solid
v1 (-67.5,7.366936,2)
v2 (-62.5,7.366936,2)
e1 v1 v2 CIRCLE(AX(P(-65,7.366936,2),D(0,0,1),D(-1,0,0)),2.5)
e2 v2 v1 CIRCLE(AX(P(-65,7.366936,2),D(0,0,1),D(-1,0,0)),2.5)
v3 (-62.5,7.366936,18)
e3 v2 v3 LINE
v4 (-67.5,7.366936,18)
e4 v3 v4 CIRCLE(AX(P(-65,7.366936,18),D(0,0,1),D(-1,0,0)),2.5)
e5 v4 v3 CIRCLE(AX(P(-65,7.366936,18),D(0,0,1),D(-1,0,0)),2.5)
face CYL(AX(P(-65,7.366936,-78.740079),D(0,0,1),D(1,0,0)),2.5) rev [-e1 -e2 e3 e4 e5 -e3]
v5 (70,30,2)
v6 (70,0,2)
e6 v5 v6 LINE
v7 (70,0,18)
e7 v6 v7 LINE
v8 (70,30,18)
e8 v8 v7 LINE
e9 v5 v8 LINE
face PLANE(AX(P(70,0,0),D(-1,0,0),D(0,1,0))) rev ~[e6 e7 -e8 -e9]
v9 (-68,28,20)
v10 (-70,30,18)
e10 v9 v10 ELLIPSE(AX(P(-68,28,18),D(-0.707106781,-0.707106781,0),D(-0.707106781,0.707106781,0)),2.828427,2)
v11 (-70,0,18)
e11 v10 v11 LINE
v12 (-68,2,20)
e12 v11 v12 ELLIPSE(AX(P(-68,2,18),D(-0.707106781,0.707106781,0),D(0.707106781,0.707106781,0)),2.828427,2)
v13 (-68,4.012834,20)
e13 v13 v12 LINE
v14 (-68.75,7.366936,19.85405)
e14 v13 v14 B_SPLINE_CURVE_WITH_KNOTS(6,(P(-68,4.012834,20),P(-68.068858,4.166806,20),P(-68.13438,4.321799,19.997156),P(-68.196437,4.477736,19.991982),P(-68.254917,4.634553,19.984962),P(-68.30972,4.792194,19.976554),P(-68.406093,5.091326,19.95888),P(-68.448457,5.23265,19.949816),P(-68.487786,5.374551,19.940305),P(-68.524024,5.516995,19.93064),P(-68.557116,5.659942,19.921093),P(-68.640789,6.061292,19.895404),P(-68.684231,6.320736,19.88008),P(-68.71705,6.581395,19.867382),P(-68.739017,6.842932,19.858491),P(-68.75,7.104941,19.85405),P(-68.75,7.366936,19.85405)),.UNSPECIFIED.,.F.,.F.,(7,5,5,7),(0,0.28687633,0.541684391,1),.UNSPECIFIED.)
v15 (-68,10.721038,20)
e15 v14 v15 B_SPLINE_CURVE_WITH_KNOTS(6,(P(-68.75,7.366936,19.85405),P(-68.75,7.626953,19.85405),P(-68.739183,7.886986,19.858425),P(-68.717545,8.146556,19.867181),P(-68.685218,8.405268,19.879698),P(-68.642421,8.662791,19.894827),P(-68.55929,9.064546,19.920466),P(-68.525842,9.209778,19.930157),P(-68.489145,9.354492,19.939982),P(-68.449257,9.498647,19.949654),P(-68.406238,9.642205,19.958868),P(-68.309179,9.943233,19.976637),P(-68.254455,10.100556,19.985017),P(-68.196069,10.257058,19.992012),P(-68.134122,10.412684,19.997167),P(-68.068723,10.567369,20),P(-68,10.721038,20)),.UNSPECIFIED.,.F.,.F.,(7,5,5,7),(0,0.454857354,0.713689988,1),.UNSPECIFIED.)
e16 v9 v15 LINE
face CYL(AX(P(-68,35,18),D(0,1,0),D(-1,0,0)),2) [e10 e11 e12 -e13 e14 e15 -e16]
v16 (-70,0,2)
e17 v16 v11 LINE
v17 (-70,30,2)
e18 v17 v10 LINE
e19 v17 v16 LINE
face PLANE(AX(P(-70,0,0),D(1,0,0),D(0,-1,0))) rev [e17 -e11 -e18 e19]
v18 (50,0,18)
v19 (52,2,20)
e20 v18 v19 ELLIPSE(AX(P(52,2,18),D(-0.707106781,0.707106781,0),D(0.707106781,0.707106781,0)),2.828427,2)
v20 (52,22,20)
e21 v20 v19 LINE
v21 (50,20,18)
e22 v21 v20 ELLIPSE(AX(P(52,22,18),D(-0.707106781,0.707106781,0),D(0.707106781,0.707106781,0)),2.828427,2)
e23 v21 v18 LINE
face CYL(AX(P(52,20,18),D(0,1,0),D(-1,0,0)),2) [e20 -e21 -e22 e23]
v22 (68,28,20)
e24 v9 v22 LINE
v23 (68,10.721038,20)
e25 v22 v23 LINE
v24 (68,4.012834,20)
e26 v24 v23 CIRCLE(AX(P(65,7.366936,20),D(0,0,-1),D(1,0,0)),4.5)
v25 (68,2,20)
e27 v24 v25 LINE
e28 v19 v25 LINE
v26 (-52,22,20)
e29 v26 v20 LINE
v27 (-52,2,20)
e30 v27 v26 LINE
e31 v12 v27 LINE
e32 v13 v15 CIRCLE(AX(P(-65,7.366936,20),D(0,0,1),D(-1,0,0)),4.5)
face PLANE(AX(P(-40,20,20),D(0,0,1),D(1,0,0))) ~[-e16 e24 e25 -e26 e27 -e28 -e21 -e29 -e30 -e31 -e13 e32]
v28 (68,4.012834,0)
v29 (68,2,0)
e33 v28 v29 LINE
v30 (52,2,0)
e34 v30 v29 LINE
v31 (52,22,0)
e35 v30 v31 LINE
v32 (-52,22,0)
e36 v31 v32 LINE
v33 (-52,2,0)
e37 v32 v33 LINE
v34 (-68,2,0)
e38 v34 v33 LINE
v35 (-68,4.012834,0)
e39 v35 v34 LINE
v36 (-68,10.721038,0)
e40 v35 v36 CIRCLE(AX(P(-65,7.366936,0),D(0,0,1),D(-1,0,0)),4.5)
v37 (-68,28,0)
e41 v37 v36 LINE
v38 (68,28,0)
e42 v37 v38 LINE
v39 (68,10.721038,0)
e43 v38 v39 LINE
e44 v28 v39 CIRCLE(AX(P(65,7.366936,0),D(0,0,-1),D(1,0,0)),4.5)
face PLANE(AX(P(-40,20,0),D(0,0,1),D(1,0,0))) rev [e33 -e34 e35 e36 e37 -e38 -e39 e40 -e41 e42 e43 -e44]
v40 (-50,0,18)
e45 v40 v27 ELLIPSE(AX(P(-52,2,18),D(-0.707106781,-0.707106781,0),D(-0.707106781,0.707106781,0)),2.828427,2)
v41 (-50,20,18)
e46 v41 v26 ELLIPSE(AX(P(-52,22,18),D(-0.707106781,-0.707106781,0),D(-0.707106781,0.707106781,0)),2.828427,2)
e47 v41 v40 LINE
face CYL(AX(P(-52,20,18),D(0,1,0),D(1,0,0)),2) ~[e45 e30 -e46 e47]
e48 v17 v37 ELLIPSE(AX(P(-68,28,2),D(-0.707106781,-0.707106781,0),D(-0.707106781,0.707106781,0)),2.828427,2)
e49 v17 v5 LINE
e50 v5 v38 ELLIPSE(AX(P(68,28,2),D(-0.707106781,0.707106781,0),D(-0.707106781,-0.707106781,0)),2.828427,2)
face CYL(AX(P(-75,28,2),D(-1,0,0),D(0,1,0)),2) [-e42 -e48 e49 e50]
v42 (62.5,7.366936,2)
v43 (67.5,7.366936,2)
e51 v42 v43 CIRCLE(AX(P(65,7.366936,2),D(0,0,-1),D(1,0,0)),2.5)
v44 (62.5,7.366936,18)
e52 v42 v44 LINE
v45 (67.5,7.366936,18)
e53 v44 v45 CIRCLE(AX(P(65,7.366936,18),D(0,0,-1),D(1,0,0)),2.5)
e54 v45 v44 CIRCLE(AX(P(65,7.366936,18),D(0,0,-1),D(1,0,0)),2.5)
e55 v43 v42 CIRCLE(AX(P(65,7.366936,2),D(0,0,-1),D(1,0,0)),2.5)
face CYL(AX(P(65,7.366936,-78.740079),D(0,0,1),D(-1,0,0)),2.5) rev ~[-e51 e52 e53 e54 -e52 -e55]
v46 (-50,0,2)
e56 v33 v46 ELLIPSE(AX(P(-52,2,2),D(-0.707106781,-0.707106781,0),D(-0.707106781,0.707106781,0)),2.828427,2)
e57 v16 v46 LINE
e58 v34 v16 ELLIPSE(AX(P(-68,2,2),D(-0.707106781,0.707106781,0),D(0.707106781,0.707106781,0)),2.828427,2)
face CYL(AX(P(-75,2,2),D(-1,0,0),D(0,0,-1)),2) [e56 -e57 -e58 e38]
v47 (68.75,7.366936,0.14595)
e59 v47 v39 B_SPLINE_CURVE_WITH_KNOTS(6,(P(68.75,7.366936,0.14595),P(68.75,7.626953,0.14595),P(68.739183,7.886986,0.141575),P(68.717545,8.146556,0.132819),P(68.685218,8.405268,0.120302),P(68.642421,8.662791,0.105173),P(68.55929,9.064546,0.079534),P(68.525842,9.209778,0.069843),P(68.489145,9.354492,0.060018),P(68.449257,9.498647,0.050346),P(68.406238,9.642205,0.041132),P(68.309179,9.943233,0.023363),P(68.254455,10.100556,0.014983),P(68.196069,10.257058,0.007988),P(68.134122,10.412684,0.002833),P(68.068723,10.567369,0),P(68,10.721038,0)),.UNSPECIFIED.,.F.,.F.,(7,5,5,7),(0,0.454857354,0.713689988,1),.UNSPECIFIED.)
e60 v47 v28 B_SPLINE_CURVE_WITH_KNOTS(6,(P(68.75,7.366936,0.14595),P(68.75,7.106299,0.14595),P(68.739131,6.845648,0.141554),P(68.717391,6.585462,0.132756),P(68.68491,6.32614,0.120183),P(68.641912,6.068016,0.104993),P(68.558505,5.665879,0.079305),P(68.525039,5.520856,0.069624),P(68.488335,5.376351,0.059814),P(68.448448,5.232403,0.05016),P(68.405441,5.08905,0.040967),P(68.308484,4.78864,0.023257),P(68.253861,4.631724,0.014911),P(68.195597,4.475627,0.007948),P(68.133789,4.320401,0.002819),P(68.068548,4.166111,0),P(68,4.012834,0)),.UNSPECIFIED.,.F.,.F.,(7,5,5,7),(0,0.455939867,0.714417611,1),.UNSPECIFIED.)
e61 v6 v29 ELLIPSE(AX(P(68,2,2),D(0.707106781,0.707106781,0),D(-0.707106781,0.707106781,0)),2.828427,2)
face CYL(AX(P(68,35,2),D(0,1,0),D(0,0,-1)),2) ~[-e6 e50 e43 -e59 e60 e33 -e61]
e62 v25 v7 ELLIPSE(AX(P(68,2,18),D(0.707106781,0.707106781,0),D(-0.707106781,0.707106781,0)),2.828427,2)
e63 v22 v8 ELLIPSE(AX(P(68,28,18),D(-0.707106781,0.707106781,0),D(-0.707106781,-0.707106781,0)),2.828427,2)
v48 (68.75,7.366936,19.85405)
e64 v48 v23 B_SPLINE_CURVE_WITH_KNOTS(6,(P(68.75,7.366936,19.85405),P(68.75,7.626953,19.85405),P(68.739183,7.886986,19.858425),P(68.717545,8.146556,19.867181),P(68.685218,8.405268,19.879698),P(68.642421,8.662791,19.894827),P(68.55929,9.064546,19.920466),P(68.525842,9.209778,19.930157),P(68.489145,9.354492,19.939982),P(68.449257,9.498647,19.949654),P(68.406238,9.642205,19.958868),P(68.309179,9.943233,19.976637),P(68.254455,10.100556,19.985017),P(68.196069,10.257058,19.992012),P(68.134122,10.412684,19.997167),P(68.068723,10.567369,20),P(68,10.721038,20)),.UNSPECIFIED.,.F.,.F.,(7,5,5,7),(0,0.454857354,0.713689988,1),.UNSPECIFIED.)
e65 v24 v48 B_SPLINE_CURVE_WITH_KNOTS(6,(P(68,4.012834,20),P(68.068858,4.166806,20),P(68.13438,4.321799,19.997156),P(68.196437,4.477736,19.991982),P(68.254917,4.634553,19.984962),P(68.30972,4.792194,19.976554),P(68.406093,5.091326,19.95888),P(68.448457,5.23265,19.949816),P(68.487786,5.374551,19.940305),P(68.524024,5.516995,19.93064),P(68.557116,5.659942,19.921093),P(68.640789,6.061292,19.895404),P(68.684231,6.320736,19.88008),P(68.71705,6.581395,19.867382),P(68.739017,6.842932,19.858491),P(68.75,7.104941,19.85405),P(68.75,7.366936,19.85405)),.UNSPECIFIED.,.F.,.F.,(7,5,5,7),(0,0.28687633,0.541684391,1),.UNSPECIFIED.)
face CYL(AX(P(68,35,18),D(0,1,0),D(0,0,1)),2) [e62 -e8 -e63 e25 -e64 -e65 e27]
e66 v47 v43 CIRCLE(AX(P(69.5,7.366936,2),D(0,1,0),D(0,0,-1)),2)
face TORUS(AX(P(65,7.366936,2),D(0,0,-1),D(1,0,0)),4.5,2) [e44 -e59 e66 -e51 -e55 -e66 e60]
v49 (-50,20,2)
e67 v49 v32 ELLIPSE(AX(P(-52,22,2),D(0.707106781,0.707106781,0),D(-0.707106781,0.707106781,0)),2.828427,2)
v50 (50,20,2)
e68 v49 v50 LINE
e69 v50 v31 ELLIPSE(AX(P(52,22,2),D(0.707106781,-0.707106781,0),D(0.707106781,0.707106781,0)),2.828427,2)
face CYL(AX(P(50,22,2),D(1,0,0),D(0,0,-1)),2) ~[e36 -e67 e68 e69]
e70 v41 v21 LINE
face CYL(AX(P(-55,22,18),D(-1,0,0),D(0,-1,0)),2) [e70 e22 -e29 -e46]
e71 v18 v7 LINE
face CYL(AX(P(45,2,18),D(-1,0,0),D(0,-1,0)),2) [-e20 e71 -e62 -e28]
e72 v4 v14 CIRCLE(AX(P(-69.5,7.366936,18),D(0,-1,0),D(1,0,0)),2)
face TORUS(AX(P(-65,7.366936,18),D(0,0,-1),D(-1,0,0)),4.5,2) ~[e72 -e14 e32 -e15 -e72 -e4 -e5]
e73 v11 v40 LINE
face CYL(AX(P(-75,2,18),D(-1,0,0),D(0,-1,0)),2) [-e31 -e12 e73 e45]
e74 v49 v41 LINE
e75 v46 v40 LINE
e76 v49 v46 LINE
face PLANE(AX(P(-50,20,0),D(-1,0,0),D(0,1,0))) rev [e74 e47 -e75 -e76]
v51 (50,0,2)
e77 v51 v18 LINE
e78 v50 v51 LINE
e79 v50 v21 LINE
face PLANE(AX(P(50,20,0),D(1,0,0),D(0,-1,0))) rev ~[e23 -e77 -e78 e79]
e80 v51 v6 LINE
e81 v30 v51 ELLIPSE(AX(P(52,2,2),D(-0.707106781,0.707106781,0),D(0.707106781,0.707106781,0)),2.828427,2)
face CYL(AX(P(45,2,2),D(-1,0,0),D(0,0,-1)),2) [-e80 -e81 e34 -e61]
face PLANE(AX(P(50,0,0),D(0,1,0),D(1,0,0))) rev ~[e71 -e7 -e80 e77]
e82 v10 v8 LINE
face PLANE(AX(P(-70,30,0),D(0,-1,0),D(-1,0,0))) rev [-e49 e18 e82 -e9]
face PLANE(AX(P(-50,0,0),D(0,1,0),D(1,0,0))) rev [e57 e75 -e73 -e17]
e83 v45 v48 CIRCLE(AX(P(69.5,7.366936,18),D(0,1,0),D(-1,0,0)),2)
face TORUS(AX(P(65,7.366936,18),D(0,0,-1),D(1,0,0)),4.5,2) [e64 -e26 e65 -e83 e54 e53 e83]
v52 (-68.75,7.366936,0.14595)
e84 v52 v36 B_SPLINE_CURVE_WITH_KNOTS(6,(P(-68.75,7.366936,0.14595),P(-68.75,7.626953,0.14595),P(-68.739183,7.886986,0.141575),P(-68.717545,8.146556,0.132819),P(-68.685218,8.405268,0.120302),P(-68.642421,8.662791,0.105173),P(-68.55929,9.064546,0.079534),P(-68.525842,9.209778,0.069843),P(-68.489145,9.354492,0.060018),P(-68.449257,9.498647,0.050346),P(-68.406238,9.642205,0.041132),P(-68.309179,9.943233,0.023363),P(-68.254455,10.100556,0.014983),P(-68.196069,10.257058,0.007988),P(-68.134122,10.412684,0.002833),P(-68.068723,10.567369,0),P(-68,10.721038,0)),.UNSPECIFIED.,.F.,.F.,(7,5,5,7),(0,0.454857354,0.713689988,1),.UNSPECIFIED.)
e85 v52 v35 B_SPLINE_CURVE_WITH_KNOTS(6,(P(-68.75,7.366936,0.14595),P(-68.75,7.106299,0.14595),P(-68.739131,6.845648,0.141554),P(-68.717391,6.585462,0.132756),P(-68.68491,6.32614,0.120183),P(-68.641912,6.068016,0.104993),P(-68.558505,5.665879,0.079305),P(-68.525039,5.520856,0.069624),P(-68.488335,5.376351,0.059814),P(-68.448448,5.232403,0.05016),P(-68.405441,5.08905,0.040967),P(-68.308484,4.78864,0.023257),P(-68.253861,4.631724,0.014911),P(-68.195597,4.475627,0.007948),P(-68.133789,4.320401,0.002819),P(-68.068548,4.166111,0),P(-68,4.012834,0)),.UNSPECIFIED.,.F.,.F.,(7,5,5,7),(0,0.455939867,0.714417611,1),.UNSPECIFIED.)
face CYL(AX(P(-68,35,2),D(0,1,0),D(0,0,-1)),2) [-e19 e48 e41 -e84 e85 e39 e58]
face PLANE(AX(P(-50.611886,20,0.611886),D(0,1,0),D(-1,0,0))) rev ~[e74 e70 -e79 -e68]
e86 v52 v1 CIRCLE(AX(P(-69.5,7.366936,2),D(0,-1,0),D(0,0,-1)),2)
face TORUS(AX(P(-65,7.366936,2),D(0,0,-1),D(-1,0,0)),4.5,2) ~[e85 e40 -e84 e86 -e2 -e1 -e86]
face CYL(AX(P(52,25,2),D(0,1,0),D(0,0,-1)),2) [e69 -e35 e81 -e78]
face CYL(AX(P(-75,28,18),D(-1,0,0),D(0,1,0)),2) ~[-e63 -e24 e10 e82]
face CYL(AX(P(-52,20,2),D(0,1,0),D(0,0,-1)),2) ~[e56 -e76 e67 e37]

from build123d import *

# Parameters (mm, degrees)
F1_DEPTH     = 20
F3_D         = 5
F5_T1_DEPTH  = 150
F5_T3_DEPTH  = 40
F5_T5_DEPTH  = 30
F5_T7_DEPTH  = 25
F5_T9_DEPTH  = 100
F5_T11_DEPTH = 30
F5_T25_DEPTH = 105
F5_T29_DEPTH = 30
F5_T36_DEPTH = 30
F5_T40_DEPTH = 105
F5_T47_DEPTH = 30
F5_T51_DEPTH = 105
F5_T58_DEPTH = 105
F5_T62_DEPTH = 30


# Not quite as in the source:
# - a fillet or chamfer that OpenCascade refuses, or shapes differently, is made with other operations: its cross-section is extruded or revolved along the edge and cut away or added


with BuildPart() as f1:
    # F0 (on Top) → F1 (new body)
    with BuildSketch(Plane.XY):
        Polygon((70, 30), (0, 30), (0, 20), (50, 20), (50, 0), (70, 0), align=None)
    extrude(amount=F1_DEPTH)

    # F3 (through all)
    with Locations(Plane(origin=(0, 0, 0), x_dir=(1, 0, 0), z_dir=(0, 0, -1))):
        with Locations((65, -7.3669357225)):
            Hole(F3_D / 2)

    # F4: F1 across face


with BuildPart() as f1_1:
    add(f1.part)
    add(f1.part.mirror(Plane(origin=(0, 25, 10), x_dir=(0, -1, 0), z_dir=(-1, 0, 0))))

    # F5: fillet of radius 2 on 20 edges, made by hand

    # F5_s2 → F5_t1 (cut)
    with BuildSketch(Plane.YZ.offset(-75)):
        with BuildLine():
            ThreePointArc((30, 18), (29.4142135624, 19.4142135624), (28, 20))
            Line((28, 20), (30, 20))
            Line((30, 20), (30, 18))
        make_face()
        with BuildLine():
            ThreePointArc((30, 2), (29.4142135624, 0.5857864376), (28, 0))
            Line((28, 0), (30, 0))
            Line((30, 0), (30, 2))
        make_face()
    extrude(amount=F5_T1_DEPTH, mode=Mode.SUBTRACT)

    # F5_s4 → F5_t3 (cut)
    with BuildSketch(Plane.XZ.offset(-35)):
        with BuildLine():
            ThreePointArc((-70, 18), (-69.4142135624, 19.4142135624), (-68, 20))
            Line((-68, 20), (-70, 20))
            Line((-70, 20), (-70, 18))
        make_face()
        with BuildLine():
            ThreePointArc((68, 20), (69.4142135624, 19.4142135624), (70, 18))
            Line((70, 18), (70, 20))
            Line((70, 20), (68, 20))
        make_face()
        with BuildLine():
            ThreePointArc((-68, 0), (-69.4142135624, 0.5857864376), (-70, 2))
            Line((-70, 2), (-70, 0))
            Line((-70, 0), (-68, 0))
        make_face()
        with BuildLine():
            ThreePointArc((68, 0), (69.4142135624, 0.5857864376), (70, 2))
            Line((70, 2), (70, 0))
            Line((70, 0), (68, 0))
        make_face()
    extrude(amount=F5_T3_DEPTH, mode=Mode.SUBTRACT)

    # F5_s6 → F5_t5 (cut)
    with BuildSketch(Plane.YZ.offset(-75)):
        with BuildLine():
            ThreePointArc((0, 18), (0.5857864376, 19.4142135624), (2, 20))
            Line((2, 20), (0, 20))
            Line((0, 20), (0, 18))
        make_face()
        with BuildLine():
            ThreePointArc((2, 0), (0.5857864376, 0.5857864376), (0, 2))
            Line((0, 2), (0, 0))
            Line((0, 0), (2, 0))
        make_face()
    extrude(amount=F5_T5_DEPTH, mode=Mode.SUBTRACT)

    # F5_s8 → F5_t7 (cut)
    with BuildSketch(Plane.XZ.offset(-20)):
        with BuildLine():
            ThreePointArc((-50, 18), (-50.5857864376, 19.4142135624), (-52, 20))
            Line((-52, 20), (-50, 20))
            Line((-50, 20), (-50, 18))
        make_face()
        with BuildLine():
            ThreePointArc((50, 18), (50.5857864376, 19.4142135624), (52, 20))
            Line((52, 20), (50, 20))
            Line((50, 20), (50, 18))
        make_face()
        with BuildLine():
            ThreePointArc((-52, 0), (-50.5857864376, 0.5857864376), (-50, 2))
            Line((-50, 2), (-50, 0))
            Line((-50, 0), (-52, 0))
        make_face()
        with BuildLine():
            ThreePointArc((52, 0), (50.5857864376, 0.5857864376), (50, 2))
            Line((50, 2), (50, 0))
            Line((50, 0), (52, 0))
        make_face()
    extrude(amount=F5_T7_DEPTH, mode=Mode.SUBTRACT)

    # F5_s10 → F5_t9 (cut)
    with BuildSketch(Plane.YZ.offset(-50)):
        with BuildLine():
            ThreePointArc((20, 18), (20.5857864376, 19.4142135624), (22, 20))
            Line((22, 20), (20, 20))
            Line((20, 20), (20, 18))
        make_face()
        with BuildLine():
            ThreePointArc((22, 0), (20.5857864376, 0.5857864376), (20, 2))
            Line((20, 2), (20, 0))
            Line((20, 0), (22, 0))
        make_face()
    extrude(amount=F5_T9_DEPTH, mode=Mode.SUBTRACT)

    # F5_s12 → F5_t11 (cut)
    with BuildSketch(Plane.YZ.offset(45)):
        with BuildLine():
            ThreePointArc((0, 18), (0.5857864376, 19.4142135624), (2, 20))
            Line((2, 20), (0, 20))
            Line((0, 20), (0, 18))
        make_face()
        with BuildLine():
            ThreePointArc((2, 0), (0.5857864376, 0.5857864376), (0, 2))
            Line((0, 2), (0, 0))
            Line((0, 0), (2, 0))
        make_face()
    extrude(amount=F5_T11_DEPTH, mode=Mode.SUBTRACT)

    # F5_s13 → F5_t14 (revolve, cut)
    with BuildSketch(Plane.XZ.offset(-7.3669357225)):
        with BuildLine():
            ThreePointArc((67.5, 18), (68.0857864376, 19.4142135624), (69.5, 20))
            Line((69.5, 20), (67.5, 20))
            Line((67.5, 20), (67.5, 18))
        make_face()
    revolve(axis=Axis((65, 7.3669357225, 20), (0, 0, -1)), mode=Mode.SUBTRACT)

    # F5_s15 → F5_t16 (revolve, cut)
    with BuildSketch(Plane.XZ.offset(-7.3669357225)):
        with BuildLine():
            ThreePointArc((-67.5, 18), (-68.0857864376, 19.4142135624), (-69.5, 20))
            Line((-69.5, 20), (-67.5, 20))
            Line((-67.5, 20), (-67.5, 18))
        make_face()
    revolve(axis=Axis((-65, 7.3669357225, 20), (0, 0, 1)), mode=Mode.SUBTRACT)

    # F5_s17 → F5_t18 (revolve, cut)
    with BuildSketch(Plane.XZ.offset(-7.3669357225)):
        with BuildLine():
            ThreePointArc((69.5, 0), (68.0857864376, 0.5857864376), (67.5, 2))
            Line((67.5, 2), (67.5, 0))
            Line((67.5, 0), (69.5, 0))
        make_face()
    revolve(axis=Axis((65, 7.3669357225, 0), (0, 0, -1)), mode=Mode.SUBTRACT)

    # F5_s19 → F5_t20 (revolve, cut)
    with BuildSketch(Plane.XZ.offset(-7.3669357225)):
        with BuildLine():
            ThreePointArc((-69.5, 0), (-68.0857864376, 0.5857864376), (-67.5, 2))
            Line((-67.5, 2), (-67.5, 0))
            Line((-67.5, 0), (-69.5, 0))
        make_face()
    revolve(axis=Axis((-65, 7.3669357225, 0), (0, 0, 1)), mode=Mode.SUBTRACT)


with BuildPart() as f5_tool23:
    # F5_s24 → F5_t25 (new body)
    with BuildSketch(Plane.YZ.offset(-55)):
        with BuildLine():
            ThreePointArc((20, 18), (20.5857864376, 19.4142135624), (22, 20))
            Line((22, 20), (20, 20))
            Line((20, 20), (20, 18))
        make_face()
    extrude(amount=F5_T25_DEPTH)

    split(bisect_by=Plane.YZ.offset(-50), keep=Keep.BOTTOM)


with BuildPart() as f5_tool27:
    # F5_s28 → F5_t29 (new body)
    with BuildSketch(Plane.XZ.offset(-25)):
        with BuildLine():
            ThreePointArc((-50, 18), (-50.5857864376, 19.4142135624), (-52, 20))
            Line((-52, 20), (-50, 20))
            Line((-50, 20), (-50, 18))
        make_face()
    extrude(amount=F5_T29_DEPTH)

    split(bisect_by=Plane.XZ.offset(-20), keep=Keep.BOTTOM)


with BuildPart() as f5_tool23_1:
    add(f5_tool23.part)

    # F5_t31: intersect F5_tool27
    add(f5_tool27.part, mode=Mode.INTERSECT)


with BuildPart() as f1_2:
    add(f1_1.part)

    # F5_t21: cut F5_tool23
    add(f5_tool23_1.part, mode=Mode.SUBTRACT)


with BuildPart() as f5_tool34:
    # F5_s35 → F5_t36 (new body)
    with BuildSketch(Plane.XZ.offset(-25)):
        with BuildLine():
            ThreePointArc((50, 18), (50.5857864376, 19.4142135624), (52, 20))
            Line((52, 20), (50, 20))
            Line((50, 20), (50, 18))
        make_face()
    extrude(amount=F5_T36_DEPTH)

    split(bisect_by=Plane.XZ.offset(-20), keep=Keep.BOTTOM)


with BuildPart() as f5_tool38:
    # F5_s39 → F5_t40 (new body)
    with BuildSketch(Plane.YZ.offset(-50)):
        with BuildLine():
            ThreePointArc((20, 18), (20.5857864376, 19.4142135624), (22, 20))
            Line((22, 20), (20, 20))
            Line((20, 20), (20, 18))
        make_face()
    extrude(amount=F5_T40_DEPTH)

    split(bisect_by=Plane.YZ.offset(50), keep=Keep.TOP)


with BuildPart() as f5_tool34_1:
    add(f5_tool34.part)

    # F5_t42: intersect F5_tool38
    add(f5_tool38.part, mode=Mode.INTERSECT)


with BuildPart() as f1_3:
    add(f1_2.part)

    # F5_t32: cut F5_tool34
    add(f5_tool34_1.part, mode=Mode.SUBTRACT)


with BuildPart() as f5_tool45:
    # F5_s46 → F5_t47 (new body)
    with BuildSketch(Plane.XZ.offset(-25)):
        with BuildLine():
            ThreePointArc((-52, 0), (-50.5857864376, 0.5857864376), (-50, 2))
            Line((-50, 2), (-50, 0))
            Line((-50, 0), (-52, 0))
        make_face()
    extrude(amount=F5_T47_DEPTH)

    split(bisect_by=Plane.XZ.offset(-20), keep=Keep.BOTTOM)


with BuildPart() as f5_tool49:
    # F5_s50 → F5_t51 (new body)
    with BuildSketch(Plane.YZ.offset(50)):
        with BuildLine():
            ThreePointArc((22, 0), (20.5857864376, 0.5857864376), (20, 2))
            Line((20, 2), (20, 0))
            Line((20, 0), (22, 0))
        make_face()
    extrude(amount=-F5_T51_DEPTH)

    split(bisect_by=Plane.YZ.offset(-50), keep=Keep.BOTTOM)


with BuildPart() as f5_tool45_1:
    add(f5_tool45.part)

    # F5_t53: intersect F5_tool49
    add(f5_tool49.part, mode=Mode.INTERSECT)


with BuildPart() as f1_4:
    add(f1_3.part)

    # F5_t43: cut F5_tool45
    add(f5_tool45_1.part, mode=Mode.SUBTRACT)


with BuildPart() as f5_tool56:
    # F5_s57 → F5_t58 (new body)
    with BuildSketch(Plane.YZ.offset(55)):
        with BuildLine():
            ThreePointArc((22, 0), (20.5857864376, 0.5857864376), (20, 2))
            Line((20, 2), (20, 0))
            Line((20, 0), (22, 0))
        make_face()
    extrude(amount=-F5_T58_DEPTH)

    split(bisect_by=Plane.YZ.offset(50), keep=Keep.TOP)


with BuildPart() as f5_tool60:
    # F5_s61 → F5_t62 (new body)
    with BuildSketch(Plane.XZ.offset(-25)):
        with BuildLine():
            ThreePointArc((52, 0), (50.5857864376, 0.5857864376), (50, 2))
            Line((50, 2), (50, 0))
            Line((50, 0), (52, 0))
        make_face()
    extrude(amount=F5_T62_DEPTH)

    split(bisect_by=Plane.XZ.offset(-20), keep=Keep.BOTTOM)


with BuildPart() as f5_tool56_1:
    add(f5_tool56.part)

    # F5_t64: intersect F5_tool60
    add(f5_tool60.part, mode=Mode.INTERSECT)


with BuildPart() as f1_5:
    add(f1_4.part)

    # F5_t54: cut F5_tool56
    add(f5_tool56_1.part, mode=Mode.SUBTRACT)


solid = f1_5.part
